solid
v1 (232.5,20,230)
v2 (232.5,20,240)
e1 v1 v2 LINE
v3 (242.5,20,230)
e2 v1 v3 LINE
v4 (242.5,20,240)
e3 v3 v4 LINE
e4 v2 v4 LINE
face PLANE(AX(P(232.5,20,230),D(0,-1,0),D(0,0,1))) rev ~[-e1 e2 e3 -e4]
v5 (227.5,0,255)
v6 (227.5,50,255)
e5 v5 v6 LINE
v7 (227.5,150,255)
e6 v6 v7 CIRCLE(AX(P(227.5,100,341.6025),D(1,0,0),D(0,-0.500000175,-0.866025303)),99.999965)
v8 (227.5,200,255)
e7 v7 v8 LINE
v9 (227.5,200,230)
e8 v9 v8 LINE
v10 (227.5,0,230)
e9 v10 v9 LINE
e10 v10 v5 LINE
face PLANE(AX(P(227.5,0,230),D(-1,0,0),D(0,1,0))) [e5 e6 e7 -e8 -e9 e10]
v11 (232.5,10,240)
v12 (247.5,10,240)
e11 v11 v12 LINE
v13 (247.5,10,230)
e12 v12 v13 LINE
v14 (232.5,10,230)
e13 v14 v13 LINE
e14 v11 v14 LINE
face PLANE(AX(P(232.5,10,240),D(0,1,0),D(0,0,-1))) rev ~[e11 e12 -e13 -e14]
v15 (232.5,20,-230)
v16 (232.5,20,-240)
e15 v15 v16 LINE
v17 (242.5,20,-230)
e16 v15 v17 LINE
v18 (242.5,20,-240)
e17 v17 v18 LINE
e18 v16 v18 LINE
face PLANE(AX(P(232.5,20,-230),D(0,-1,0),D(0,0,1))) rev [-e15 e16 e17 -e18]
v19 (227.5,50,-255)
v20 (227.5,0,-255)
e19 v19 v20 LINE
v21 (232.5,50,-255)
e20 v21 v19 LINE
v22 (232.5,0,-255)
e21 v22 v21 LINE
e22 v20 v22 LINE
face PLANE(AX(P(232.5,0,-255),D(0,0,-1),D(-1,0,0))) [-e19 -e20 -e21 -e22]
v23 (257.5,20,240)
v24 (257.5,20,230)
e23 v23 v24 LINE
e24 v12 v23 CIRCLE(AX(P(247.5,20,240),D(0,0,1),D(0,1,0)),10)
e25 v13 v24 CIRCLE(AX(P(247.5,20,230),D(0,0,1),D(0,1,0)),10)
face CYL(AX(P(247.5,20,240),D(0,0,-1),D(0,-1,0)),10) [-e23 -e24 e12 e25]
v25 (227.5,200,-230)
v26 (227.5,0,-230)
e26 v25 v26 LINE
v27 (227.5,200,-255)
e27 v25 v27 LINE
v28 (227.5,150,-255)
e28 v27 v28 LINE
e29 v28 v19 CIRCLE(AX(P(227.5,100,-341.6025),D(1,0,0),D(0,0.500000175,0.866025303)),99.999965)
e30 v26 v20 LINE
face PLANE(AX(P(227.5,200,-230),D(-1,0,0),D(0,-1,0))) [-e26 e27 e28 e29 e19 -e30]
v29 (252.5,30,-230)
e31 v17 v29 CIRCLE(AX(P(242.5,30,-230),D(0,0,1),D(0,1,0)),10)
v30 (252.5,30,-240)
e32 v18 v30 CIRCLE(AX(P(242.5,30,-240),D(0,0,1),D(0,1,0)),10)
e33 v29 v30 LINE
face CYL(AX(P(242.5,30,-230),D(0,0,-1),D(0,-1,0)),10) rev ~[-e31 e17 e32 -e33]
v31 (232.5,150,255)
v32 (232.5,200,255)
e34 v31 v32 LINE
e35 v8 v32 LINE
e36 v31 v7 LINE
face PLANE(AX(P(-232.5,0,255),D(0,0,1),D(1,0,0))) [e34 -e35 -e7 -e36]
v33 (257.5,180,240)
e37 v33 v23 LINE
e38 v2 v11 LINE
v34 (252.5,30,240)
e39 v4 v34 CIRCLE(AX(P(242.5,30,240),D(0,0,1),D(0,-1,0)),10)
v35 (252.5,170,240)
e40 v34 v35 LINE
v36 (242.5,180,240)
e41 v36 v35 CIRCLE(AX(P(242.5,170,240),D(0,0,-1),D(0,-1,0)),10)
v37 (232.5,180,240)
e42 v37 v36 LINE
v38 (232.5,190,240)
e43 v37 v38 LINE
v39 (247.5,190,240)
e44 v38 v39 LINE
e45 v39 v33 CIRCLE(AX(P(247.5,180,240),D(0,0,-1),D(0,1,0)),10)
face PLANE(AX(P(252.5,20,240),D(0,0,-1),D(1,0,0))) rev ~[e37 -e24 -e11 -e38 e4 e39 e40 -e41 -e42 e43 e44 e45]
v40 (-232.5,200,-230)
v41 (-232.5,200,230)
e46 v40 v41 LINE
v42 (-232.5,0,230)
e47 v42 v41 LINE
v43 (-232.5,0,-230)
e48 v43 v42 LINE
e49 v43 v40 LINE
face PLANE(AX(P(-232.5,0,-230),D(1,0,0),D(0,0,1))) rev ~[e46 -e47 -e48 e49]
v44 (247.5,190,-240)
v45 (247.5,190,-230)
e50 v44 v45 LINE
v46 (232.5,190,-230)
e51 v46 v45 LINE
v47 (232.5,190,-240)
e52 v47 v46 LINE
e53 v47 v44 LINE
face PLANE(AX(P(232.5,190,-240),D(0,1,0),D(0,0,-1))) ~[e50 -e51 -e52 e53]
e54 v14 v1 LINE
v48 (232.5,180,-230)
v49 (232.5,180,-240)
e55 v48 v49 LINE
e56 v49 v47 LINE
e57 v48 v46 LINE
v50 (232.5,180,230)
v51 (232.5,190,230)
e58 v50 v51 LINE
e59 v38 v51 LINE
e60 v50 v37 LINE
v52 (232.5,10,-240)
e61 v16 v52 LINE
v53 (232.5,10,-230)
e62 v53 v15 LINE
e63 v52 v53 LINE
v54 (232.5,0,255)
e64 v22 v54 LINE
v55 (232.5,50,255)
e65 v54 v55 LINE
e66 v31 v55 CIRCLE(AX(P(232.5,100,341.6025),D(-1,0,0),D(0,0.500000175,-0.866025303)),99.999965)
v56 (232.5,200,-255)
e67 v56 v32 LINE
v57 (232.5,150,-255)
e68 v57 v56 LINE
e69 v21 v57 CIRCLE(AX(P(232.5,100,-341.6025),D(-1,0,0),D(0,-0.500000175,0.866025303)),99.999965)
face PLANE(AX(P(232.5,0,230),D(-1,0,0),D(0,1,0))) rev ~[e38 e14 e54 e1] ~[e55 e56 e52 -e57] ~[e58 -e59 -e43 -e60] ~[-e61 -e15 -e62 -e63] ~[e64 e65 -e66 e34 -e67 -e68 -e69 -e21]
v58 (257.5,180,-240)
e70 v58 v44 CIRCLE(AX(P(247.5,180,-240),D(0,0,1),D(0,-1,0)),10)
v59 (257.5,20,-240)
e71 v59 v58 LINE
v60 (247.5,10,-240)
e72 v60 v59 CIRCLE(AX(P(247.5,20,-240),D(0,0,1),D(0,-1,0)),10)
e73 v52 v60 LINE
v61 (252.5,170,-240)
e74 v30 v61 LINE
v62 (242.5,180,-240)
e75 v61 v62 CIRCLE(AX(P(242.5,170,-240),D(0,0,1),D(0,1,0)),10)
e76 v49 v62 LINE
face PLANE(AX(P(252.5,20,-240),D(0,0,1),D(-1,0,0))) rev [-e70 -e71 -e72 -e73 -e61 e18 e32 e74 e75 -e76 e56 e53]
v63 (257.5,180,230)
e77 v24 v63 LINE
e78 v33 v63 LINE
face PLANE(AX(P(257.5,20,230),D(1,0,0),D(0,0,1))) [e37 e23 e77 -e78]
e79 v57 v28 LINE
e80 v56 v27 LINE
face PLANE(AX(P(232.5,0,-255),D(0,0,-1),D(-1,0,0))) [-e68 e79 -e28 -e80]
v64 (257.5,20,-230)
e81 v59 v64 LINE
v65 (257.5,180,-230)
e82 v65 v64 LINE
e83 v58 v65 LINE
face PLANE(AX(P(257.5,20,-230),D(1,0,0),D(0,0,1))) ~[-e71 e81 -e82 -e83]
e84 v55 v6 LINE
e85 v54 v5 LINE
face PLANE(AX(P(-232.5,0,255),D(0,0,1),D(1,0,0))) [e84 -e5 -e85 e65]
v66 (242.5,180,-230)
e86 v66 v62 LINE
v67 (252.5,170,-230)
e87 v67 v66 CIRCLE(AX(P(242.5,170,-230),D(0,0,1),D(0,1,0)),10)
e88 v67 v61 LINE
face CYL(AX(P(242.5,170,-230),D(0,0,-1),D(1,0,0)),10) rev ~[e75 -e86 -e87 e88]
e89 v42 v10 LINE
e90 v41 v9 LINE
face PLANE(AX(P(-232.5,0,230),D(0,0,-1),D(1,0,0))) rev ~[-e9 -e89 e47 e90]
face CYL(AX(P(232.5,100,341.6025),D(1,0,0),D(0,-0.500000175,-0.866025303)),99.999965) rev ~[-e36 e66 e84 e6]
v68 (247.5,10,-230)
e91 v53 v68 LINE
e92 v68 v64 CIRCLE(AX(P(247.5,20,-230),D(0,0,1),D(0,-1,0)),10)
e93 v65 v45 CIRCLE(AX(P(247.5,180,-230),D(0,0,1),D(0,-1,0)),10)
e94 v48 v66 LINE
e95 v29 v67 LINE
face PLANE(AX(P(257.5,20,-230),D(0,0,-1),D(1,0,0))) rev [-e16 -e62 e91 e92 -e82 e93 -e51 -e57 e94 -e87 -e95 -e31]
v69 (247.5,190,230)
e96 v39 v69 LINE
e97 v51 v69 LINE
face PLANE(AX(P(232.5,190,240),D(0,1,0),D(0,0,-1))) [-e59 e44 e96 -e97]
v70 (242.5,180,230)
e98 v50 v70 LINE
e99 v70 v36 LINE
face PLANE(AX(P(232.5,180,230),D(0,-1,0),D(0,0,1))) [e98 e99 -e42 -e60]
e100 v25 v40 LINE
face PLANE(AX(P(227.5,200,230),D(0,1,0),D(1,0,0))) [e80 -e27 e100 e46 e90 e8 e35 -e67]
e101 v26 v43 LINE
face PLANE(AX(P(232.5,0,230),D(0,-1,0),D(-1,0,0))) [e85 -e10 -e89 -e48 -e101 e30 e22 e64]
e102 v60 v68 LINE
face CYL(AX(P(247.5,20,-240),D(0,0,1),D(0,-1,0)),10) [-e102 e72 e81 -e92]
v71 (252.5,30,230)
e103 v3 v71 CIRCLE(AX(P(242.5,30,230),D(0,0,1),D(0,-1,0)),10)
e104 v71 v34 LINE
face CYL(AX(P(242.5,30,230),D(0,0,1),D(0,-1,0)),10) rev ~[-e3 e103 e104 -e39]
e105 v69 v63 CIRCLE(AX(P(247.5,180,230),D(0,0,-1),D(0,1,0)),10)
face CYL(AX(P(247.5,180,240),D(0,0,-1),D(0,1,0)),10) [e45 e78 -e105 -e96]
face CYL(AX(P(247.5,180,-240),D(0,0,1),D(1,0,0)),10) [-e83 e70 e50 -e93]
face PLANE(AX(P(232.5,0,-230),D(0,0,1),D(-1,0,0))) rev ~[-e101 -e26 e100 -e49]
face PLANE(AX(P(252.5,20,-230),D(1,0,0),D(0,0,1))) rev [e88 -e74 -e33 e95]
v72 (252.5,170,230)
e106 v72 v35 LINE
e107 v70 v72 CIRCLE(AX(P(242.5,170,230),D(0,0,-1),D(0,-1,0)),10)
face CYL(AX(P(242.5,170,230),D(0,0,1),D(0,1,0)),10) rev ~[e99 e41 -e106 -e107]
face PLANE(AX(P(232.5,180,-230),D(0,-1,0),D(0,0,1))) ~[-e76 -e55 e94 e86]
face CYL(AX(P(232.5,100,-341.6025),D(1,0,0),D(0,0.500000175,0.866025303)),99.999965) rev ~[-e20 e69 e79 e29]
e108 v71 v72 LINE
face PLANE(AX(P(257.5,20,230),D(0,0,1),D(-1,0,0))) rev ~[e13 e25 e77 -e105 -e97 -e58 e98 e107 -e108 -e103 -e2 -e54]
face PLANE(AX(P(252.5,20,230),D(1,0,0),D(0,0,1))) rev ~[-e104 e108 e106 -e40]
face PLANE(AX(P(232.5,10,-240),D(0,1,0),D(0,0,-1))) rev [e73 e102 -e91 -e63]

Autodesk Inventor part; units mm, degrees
ref_plane "YZ Plane" through (0, 0, 0) normal (1, 0, 0) x (0, 1, 0)
ref_plane "XZ Plane" through (0, 0, 0) normal (0, 1, 0) x (-1, 0, 0)
ref_plane "XY Plane" through (0, 0, 0) normal (0, 0, 1) x (1, 0, 0)
sketch "Sketch1" plane through (0, 0, 0) normal (0, 1, 0) x (-1, 0, 0)
  line L0 (232.5, 230) -> (-232.5, 230)
  line L1 (-232.5, 230) -> (-232.5, -230)
  line L2 (-232.5, -230) -> (232.5, -230)
  line L3 (232.5, -230) -> (232.5, 230)
  line L4 (232.5, 230) -> (-232.5, -230) construction
  line L5 (-232.5, 230) -> (232.5, -230) construction
  point P0 (0, 0)
  dimension "d0" = 465
  dimension "d1" = 460
extrude "Extrusion1" add sketch "Sketch1" along normal blind 200
sketch "Sketch3" plane through (232.5, 0, -230) normal (0, 0, -1) x (-1, 0, 0)
  line L0 (0, 0) -> (0, 200) projected
  line L1 (0, 200) -> (5, 200)
  line L2 (0, 200) -> (465, 200) projected
  line L3 (5, 200) -> (5, 0)
  line L4 (5, 0) -> (0, 0)
  line L5 (0, 0) -> (0, 200)
  point P0 (232.5, 0)
  dimension "d6" = 5
extrude "Extrusion3" add sketch "Sketch3" along normal blind 25
sketch "Sketch4" plane through (-232.5, 0, 230) normal (0, 0, 1) x (1, 0, 0)
  line L0 (465, 0) -> (465, 200) projected
  line L1 (465, 200) -> (465, 0)
  line L2 (465, 0) -> (460, 0)
  line L3 (0, 0) -> (465, 0) projected
  line L4 (460, 0) -> (460, 200)
  line L5 (0, 200) -> (465, 200) projected
  point P0 (232.5, 0)
  dimension "d10" = 5
extrude "Extrusion4" add sketch "Sketch4" along normal blind 25
sketch "Sketch5" plane through (232.5, 0, -255) normal (1, 0, 0) x (0, 0, -1)
  line L0 (-510, 100) -> (0, 100)
  line L1 (0, 200) -> (0, 0) projected
  line L2 (-510, 100) -> (-510, 150)
  line L3 (-510, 0) -> (-510, 200) projected
  line L4 (-510, 100) -> (-510, 50)
  line L5 (-510, 100) -> (-460, 100) construction
  arc A0 (-510, 50) -> (-510, 150) centre (-596.6025, 100) ccw
  line L6 (0, 100) -> (0, 150)
  line L7 (0, 100) -> (0, 50)
  arc A1 (0, 150) -> (0, 50) centre (86.6025, 100) ccw
  point P0 (-255, 0)
  point P1 (-510, 50)
  dimension "d13" = 50
  dimension "d14" = 50
  dimension "d15" = 90
  dimension "d16" = 100
  dimension "d17" = 50
  dimension "d18" = 100
extrude "Extrusion5" cut sketch "Sketch5" against normal blind 25
sketch "Sketch6" plane through (232.5, 0, 255) normal (1, 0, 0) x (0, 0, -1)
  line L0 (25, 0) -> (25, 200) projected
  line L1 (25, 190) -> (25, 180)
  line L2 (25, 180) -> (15, 180)
  line L3 (15, 180) -> (15, 190)
  line L4 (15, 190) -> (25, 190)
  point P0 (255, 0)
  point P1 (0, 200)
  dimension "d22" = 10
  dimension "d23" = 10
extrude "Extrusion6" add sketch "Sketch6" along normal blind 25
mirror "Mirror1" about plane through (0, 0, 0) normal (0, 0, 1) of "Extrusion6"
sketch "Sketch7" plane through (232.5, 0, 255) normal (1, 0, 0) x (0, 0, -1)
  line L0 (0, 0) -> (510, 0) projected
  line L1 (0, 50) -> (0, 0) projected
  line L2 (25, 0) -> (25, 200) projected
  line L3 (25, 10) -> (25, 20)
  line L4 (25, 20) -> (15, 20)
  line L5 (15, 20) -> (15, 10)
  line L6 (15, 10) -> (25, 10)
  point P0 (255, 0)
  dimension "d27" = 10
  dimension "d28" = 10
extrude "Extrusion7" add sketch "Sketch7" along normal blind 25
mirror "Mirror2" about plane through (0, 0, 0) normal (0, 0, 1) of "Extrusion7"
sketch "Sketch8" plane through (232.5, 20, 240) normal (0, 1, 0) x (1, 0, 0)
  line L0 (25, 10) -> (25, 0) projected
  line L1 (25, 0) -> (25, 10)
  line L2 (25, 10) -> (20, 10)
  line L3 (0, 10) -> (25, 10) projected
  line L4 (20, 10) -> (20, 0)
  line L5 (0, 0) -> (25, 0) projected
  line L6 (25, 0) -> (20, 0)
  point P0 (-232.5, 240)
  dimension "d31" = 5
  dimension "d32" = 90
extrude "Extrusion8" add sketch "Sketch8" along normal blind 160
mirror "Mirror3" about plane through (0, 0, 0) normal (0, 0, 1) of "Extrusion8"
fillet "Face Fillet1" radius 10 1 edges at (252.5, 20, 235)
fillet "Face Fillet2" radius 10 1 edges at (257.5, 10, 235)
fillet "Face Fillet3" radius 10 1 edges at (257.5, 10, -235)
fillet "Face Fillet4" radius 10 1 edges at (257.5, 190, -235)
fillet "Face Fillet5" radius 10 1 edges at (257.5, 190, 235)
fillet "Face Fillet6" radius 10 1 edges at (252.5, 20, -235)
fillet "Face Fillet7" radius 10 1 edges at (252.5, 180, -235)
fillet "Face Fillet8" radius 10 1 edges at (252.5, 180, 235)
properties part number "PC"
